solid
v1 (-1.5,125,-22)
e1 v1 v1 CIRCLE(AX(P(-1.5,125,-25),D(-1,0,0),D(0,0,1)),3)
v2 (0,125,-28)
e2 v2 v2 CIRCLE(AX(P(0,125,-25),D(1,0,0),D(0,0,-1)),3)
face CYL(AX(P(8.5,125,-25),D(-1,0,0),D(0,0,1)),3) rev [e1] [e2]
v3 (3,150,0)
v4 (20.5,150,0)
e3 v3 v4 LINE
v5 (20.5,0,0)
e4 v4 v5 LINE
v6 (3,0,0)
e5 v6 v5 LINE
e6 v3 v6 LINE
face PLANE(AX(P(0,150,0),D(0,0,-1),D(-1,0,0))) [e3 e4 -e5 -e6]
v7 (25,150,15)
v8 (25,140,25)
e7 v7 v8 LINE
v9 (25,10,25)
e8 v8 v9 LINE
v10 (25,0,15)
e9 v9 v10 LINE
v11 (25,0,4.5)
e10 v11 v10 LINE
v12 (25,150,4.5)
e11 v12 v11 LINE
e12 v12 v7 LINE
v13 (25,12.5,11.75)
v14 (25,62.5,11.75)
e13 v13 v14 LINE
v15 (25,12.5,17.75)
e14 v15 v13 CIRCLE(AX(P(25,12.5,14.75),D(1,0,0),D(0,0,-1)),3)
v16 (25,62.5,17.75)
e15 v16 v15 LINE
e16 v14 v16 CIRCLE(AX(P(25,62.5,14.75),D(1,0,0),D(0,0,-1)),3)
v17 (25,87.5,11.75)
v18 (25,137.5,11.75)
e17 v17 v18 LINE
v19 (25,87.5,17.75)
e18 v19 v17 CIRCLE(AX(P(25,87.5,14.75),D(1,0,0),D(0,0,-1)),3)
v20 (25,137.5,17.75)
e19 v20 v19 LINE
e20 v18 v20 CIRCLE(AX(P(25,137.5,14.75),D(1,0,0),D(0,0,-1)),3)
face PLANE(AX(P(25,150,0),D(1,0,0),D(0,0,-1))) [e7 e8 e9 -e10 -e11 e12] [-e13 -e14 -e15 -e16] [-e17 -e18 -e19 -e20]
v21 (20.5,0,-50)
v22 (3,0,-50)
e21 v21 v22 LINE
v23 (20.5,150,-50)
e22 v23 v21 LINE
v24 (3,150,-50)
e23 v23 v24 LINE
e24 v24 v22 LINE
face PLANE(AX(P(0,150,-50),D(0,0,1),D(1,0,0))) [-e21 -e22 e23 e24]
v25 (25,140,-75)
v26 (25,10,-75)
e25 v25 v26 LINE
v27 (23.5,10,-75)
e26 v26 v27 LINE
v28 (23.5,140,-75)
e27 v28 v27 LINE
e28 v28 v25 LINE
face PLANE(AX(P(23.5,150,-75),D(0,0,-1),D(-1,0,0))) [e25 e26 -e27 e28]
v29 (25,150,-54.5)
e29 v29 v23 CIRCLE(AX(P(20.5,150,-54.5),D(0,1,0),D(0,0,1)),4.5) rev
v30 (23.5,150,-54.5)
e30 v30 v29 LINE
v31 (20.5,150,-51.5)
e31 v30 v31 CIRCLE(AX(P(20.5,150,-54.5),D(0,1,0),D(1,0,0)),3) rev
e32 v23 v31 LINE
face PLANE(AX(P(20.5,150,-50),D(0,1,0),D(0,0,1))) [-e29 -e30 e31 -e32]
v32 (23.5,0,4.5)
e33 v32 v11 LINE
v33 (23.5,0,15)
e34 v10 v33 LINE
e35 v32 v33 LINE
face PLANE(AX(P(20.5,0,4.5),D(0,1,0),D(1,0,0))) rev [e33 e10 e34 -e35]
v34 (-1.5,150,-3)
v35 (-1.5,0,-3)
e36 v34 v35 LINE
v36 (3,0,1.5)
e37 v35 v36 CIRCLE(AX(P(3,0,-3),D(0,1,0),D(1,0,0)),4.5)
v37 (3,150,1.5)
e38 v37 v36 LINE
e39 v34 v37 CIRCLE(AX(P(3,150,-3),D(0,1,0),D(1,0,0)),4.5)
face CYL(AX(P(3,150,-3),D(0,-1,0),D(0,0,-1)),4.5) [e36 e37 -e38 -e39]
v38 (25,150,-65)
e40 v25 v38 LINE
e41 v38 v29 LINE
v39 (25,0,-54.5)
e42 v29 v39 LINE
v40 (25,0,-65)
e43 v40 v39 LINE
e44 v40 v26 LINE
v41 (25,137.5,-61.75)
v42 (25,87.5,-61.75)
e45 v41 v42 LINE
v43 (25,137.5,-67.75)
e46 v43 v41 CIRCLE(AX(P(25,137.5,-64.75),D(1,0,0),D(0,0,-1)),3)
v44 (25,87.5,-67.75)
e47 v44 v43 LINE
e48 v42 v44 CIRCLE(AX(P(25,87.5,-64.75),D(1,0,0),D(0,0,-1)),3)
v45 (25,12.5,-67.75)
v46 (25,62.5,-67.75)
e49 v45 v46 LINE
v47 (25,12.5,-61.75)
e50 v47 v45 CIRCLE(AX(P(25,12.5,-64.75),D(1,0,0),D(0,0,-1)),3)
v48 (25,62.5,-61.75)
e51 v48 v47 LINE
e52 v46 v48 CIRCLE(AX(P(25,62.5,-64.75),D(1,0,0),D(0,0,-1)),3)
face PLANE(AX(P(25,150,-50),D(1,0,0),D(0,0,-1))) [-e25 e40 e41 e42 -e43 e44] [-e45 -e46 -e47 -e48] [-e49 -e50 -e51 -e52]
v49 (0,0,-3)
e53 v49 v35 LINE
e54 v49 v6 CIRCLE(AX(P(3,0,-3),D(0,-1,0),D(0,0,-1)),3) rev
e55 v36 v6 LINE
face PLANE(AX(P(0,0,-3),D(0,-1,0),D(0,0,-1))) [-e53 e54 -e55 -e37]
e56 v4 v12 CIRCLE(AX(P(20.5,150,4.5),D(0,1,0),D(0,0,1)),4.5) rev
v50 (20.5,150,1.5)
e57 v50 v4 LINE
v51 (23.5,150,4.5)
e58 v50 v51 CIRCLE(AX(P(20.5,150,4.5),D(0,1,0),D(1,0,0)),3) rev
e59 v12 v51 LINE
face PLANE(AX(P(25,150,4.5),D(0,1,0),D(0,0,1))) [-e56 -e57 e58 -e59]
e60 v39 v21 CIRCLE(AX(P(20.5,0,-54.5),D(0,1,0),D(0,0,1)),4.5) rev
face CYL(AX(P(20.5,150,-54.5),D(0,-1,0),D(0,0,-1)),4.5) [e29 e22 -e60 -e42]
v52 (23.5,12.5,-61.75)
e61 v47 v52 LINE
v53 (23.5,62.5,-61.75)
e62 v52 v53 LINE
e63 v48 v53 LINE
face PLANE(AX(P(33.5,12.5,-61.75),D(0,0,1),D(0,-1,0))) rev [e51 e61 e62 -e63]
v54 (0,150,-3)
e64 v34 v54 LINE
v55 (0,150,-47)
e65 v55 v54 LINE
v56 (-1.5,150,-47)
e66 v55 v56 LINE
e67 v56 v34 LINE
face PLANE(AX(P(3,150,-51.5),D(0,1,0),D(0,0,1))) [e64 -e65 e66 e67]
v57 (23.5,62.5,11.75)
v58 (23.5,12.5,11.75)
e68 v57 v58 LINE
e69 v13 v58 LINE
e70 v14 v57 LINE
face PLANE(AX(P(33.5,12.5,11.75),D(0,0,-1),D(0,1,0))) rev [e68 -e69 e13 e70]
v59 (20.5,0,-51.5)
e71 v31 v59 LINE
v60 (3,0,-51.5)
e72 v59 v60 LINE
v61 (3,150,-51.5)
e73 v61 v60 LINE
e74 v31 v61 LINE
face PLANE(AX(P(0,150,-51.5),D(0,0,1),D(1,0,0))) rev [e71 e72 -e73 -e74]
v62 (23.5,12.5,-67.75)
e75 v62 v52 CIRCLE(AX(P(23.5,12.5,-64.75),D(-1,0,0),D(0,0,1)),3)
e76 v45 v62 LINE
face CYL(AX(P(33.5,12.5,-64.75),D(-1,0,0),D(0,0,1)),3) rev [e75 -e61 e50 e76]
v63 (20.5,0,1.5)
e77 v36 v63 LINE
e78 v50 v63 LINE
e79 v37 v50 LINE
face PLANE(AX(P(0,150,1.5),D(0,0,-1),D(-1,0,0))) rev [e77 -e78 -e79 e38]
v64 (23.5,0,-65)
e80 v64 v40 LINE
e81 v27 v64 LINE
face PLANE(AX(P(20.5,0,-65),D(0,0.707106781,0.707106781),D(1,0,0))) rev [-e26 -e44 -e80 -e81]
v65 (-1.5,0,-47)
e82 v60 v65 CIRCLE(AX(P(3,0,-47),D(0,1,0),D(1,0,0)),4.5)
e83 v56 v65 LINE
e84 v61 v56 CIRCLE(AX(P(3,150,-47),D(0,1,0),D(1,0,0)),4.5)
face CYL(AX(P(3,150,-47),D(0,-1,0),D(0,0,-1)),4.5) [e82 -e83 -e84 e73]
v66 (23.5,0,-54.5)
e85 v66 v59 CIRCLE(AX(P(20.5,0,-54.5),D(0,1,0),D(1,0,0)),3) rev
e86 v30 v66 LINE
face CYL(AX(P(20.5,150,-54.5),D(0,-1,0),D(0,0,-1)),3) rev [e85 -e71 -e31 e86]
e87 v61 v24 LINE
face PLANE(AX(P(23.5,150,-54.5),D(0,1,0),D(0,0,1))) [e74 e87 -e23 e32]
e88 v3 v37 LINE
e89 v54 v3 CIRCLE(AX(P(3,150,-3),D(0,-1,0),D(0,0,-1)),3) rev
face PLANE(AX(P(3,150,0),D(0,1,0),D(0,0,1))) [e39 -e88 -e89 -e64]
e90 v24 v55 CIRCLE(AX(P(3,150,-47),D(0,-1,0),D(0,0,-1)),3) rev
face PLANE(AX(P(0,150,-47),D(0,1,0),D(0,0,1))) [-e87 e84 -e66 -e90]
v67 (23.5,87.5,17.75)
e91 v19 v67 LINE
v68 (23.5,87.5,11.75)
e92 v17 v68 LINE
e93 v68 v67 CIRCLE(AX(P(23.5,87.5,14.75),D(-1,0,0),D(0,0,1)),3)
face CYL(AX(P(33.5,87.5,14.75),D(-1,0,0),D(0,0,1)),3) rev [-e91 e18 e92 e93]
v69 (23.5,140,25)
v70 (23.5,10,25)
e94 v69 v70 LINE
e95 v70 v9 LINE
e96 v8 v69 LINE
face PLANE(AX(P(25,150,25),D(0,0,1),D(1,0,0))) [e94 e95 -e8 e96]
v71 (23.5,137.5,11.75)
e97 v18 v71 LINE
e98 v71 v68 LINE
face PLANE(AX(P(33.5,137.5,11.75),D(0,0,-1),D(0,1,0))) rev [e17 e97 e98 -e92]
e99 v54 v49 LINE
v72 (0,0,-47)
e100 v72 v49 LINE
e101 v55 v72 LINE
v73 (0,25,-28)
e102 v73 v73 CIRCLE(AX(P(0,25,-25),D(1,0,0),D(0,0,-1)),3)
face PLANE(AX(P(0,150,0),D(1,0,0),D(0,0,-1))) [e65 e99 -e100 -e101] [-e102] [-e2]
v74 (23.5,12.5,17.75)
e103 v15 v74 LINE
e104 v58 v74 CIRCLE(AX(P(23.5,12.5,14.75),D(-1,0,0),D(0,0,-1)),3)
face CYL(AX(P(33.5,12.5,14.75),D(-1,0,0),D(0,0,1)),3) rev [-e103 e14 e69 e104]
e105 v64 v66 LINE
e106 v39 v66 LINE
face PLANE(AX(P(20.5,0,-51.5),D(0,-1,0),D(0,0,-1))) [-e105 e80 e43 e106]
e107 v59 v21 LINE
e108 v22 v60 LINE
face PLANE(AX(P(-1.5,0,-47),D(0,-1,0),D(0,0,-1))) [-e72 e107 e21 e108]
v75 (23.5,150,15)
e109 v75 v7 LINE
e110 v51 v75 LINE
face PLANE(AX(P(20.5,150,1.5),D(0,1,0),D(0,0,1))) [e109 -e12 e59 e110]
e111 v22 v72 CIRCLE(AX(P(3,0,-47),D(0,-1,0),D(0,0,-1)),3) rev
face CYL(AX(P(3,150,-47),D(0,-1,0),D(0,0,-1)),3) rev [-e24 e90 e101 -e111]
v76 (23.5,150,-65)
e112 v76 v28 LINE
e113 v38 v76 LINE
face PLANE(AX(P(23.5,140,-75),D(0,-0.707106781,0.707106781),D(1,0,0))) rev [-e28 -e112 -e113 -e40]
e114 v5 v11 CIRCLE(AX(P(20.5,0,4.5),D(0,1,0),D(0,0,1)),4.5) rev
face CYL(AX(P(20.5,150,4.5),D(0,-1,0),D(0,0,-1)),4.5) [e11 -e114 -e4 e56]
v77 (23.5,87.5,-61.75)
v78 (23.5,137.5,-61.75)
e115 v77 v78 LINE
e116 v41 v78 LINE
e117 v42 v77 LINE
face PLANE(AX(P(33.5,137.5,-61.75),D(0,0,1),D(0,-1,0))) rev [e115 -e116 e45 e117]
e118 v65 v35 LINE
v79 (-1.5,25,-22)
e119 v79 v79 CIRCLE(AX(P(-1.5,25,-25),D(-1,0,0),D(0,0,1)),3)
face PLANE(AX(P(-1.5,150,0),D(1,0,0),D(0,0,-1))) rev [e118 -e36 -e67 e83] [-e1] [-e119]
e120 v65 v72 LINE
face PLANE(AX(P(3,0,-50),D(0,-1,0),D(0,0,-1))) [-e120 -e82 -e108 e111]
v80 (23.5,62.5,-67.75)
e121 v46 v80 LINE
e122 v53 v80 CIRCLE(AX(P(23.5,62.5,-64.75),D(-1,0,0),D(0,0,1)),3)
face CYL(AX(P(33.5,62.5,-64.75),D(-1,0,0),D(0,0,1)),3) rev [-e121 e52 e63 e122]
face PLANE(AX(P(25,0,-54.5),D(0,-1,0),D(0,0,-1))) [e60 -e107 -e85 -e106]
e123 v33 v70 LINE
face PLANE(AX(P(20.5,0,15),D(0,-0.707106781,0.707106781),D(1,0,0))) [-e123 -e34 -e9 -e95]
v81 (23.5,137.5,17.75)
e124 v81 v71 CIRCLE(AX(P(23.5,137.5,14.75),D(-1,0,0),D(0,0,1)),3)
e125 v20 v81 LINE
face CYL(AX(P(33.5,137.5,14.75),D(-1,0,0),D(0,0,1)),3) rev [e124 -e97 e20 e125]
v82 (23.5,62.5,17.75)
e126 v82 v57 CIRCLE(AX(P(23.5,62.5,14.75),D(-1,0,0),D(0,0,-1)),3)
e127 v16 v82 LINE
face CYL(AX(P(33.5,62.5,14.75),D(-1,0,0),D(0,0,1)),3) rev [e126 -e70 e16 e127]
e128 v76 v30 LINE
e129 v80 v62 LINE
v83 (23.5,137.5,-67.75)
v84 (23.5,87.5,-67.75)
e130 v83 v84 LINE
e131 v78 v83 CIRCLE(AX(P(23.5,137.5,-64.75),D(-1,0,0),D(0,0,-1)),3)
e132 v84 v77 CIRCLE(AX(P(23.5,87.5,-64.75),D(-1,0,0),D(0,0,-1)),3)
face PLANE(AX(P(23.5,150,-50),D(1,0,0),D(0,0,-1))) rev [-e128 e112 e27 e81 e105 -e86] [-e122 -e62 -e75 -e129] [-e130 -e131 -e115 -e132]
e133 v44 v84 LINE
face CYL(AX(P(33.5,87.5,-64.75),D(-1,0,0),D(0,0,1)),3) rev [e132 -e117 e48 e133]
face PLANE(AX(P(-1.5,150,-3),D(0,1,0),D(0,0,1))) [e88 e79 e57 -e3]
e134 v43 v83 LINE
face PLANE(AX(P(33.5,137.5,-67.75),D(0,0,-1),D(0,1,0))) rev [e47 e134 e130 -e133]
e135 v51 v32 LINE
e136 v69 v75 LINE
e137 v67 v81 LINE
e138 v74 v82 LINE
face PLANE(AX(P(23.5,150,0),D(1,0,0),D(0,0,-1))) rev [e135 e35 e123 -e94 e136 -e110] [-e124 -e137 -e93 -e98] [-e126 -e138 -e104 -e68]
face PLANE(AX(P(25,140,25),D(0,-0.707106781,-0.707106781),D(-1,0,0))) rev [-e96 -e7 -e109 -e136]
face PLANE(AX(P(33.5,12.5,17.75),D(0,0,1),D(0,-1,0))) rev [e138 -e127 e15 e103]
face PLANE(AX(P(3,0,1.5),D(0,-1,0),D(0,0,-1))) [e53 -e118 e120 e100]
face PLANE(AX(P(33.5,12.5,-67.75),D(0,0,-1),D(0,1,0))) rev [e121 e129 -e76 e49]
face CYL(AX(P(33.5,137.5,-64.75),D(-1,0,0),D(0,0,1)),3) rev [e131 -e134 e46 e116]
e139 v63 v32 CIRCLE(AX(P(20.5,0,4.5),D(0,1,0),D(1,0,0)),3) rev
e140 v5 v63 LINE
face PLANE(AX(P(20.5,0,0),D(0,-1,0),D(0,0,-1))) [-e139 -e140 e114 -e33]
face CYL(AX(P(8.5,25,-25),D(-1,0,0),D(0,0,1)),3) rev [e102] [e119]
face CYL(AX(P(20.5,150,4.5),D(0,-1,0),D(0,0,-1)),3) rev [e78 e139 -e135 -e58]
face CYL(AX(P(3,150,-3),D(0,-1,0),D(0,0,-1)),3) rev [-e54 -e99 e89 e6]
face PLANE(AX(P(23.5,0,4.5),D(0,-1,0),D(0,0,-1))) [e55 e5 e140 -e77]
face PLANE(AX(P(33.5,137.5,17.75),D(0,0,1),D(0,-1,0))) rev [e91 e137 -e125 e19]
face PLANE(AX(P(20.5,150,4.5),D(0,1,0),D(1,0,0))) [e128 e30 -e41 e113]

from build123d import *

# Parameters (mm, degrees)
BASE_FLANGE1_DEPTH = 150
CHAMFER1_SIZE      = 10
SKETCH6_R          = 3
CUT_EXTRUDE1_DEPTH = 10
CUT_EXTRUDE2_DEPTH = 10


# Sheet-metal steps are written as plain solids
with BuildPart() as part:
    # Sketch1 → Base-Flange1 (new body)
    with BuildSketch(Plane(origin=(0, 0, 0), x_dir=(1, 0, 0), z_dir=(0, 1, 0))):
        with BuildLine():
            Line((25, -25), (25, -4.5))
            ThreePointArc((25, -4.5), (23.681980515, -1.318019485), (20.5, 0))
            Line((20.5, 0), (3, 0))
            ThreePointArc((3, 0), (0.878679656, 0.878679656), (0, 3))
            Line((0, 3), (0, 47))
            ThreePointArc((0, 47), (0.878679656, 49.121320344), (3, 50))
            Line((3, 50), (20.5, 50))
            ThreePointArc((20.5, 50), (23.681980515, 51.318019485), (25, 54.5))
            Line((25, 54.5), (25, 75))
            Line((25, 75), (23.5, 75))
            Line((23.5, 75), (23.5, 54.5))
            ThreePointArc((23.5, 54.5), (22.621320344, 52.378679656), (20.5, 51.5))
            Line((20.5, 51.5), (3, 51.5))
            ThreePointArc((3, 51.5), (-0.181980515, 50.181980515), (-1.5, 47))
            Line((-1.5, 47), (-1.5, 3))
            ThreePointArc((-1.5, 3), (-0.181980515, -0.181980515), (3, -1.5))
            Line((3, -1.5), (20.5, -1.5))
            ThreePointArc((20.5, -1.5), (22.621320344, -2.378679656), (23.5, -4.5))
            Line((23.5, -4.5), (23.5, -25))
            Line((23.5, -25), (25, -25))
        make_face()
    extrude(amount=BASE_FLANGE1_DEPTH)

    # Chamfer1
    chamfer1_edges = [part.edges().sort_by_distance(p)[0] for p in [
        (24.25, 0, -75),
        (24.25, 0, 25),
        (24.25, 150, -75),
        (24.25, 150, 25),
    ]]
    chamfer(chamfer1_edges, length=CHAMFER1_SIZE)

    # Sketch6 → Cut-Extrude1 (cut)
    with BuildSketch(Plane.ZY.offset(1.5)):
        with Locations((-25, 25)):
            Circle(SKETCH6_R)
        with Locations((-25, 125)):
            Circle(SKETCH6_R)
    extrude(amount=-CUT_EXTRUDE1_DEPTH, mode=Mode.SUBTRACT)

    # Sketch7 → Cut-Extrude2 (cut)
    with BuildSketch(Plane.ZY.offset(-23.5)):
        with BuildLine():
            Line((-67.75, 12.5), (-67.75, 62.5))
            ThreePointArc((-67.75, 62.5), (-64.75, 65.5), (-61.75, 62.5))
            Line((-61.75, 62.5), (-61.75, 12.5))
            ThreePointArc((-61.75, 12.5), (-64.75, 9.5), (-67.75, 12.5))
        make_face()
        with BuildLine():
            Line((-67.75, 137.5), (-67.75, 87.5))
            ThreePointArc((-67.75, 87.5), (-64.75, 84.5), (-61.75, 87.5))
            Line((-61.75, 87.5), (-61.75, 137.5))
            ThreePointArc((-61.75, 137.5), (-64.75, 140.5), (-67.75, 137.5))
        make_face()
        with BuildLine():
            Line((17.75, 137.5), (17.75, 87.5))
            ThreePointArc((17.75, 87.5), (14.75, 84.5), (11.75, 87.5))
            Line((11.75, 87.5), (11.75, 137.5))
            ThreePointArc((11.75, 137.5), (14.75, 140.5), (17.75, 137.5))
        make_face()
        with BuildLine():
            Line((17.75, 12.5), (17.75, 62.5))
            ThreePointArc((17.75, 62.5), (14.75, 65.5), (11.75, 62.5))
            Line((11.75, 62.5), (11.75, 12.5))
            ThreePointArc((11.75, 12.5), (14.75, 9.5), (17.75, 12.5))
        make_face()
    extrude(amount=-CUT_EXTRUDE2_DEPTH, mode=Mode.SUBTRACT)


solid = part.part
